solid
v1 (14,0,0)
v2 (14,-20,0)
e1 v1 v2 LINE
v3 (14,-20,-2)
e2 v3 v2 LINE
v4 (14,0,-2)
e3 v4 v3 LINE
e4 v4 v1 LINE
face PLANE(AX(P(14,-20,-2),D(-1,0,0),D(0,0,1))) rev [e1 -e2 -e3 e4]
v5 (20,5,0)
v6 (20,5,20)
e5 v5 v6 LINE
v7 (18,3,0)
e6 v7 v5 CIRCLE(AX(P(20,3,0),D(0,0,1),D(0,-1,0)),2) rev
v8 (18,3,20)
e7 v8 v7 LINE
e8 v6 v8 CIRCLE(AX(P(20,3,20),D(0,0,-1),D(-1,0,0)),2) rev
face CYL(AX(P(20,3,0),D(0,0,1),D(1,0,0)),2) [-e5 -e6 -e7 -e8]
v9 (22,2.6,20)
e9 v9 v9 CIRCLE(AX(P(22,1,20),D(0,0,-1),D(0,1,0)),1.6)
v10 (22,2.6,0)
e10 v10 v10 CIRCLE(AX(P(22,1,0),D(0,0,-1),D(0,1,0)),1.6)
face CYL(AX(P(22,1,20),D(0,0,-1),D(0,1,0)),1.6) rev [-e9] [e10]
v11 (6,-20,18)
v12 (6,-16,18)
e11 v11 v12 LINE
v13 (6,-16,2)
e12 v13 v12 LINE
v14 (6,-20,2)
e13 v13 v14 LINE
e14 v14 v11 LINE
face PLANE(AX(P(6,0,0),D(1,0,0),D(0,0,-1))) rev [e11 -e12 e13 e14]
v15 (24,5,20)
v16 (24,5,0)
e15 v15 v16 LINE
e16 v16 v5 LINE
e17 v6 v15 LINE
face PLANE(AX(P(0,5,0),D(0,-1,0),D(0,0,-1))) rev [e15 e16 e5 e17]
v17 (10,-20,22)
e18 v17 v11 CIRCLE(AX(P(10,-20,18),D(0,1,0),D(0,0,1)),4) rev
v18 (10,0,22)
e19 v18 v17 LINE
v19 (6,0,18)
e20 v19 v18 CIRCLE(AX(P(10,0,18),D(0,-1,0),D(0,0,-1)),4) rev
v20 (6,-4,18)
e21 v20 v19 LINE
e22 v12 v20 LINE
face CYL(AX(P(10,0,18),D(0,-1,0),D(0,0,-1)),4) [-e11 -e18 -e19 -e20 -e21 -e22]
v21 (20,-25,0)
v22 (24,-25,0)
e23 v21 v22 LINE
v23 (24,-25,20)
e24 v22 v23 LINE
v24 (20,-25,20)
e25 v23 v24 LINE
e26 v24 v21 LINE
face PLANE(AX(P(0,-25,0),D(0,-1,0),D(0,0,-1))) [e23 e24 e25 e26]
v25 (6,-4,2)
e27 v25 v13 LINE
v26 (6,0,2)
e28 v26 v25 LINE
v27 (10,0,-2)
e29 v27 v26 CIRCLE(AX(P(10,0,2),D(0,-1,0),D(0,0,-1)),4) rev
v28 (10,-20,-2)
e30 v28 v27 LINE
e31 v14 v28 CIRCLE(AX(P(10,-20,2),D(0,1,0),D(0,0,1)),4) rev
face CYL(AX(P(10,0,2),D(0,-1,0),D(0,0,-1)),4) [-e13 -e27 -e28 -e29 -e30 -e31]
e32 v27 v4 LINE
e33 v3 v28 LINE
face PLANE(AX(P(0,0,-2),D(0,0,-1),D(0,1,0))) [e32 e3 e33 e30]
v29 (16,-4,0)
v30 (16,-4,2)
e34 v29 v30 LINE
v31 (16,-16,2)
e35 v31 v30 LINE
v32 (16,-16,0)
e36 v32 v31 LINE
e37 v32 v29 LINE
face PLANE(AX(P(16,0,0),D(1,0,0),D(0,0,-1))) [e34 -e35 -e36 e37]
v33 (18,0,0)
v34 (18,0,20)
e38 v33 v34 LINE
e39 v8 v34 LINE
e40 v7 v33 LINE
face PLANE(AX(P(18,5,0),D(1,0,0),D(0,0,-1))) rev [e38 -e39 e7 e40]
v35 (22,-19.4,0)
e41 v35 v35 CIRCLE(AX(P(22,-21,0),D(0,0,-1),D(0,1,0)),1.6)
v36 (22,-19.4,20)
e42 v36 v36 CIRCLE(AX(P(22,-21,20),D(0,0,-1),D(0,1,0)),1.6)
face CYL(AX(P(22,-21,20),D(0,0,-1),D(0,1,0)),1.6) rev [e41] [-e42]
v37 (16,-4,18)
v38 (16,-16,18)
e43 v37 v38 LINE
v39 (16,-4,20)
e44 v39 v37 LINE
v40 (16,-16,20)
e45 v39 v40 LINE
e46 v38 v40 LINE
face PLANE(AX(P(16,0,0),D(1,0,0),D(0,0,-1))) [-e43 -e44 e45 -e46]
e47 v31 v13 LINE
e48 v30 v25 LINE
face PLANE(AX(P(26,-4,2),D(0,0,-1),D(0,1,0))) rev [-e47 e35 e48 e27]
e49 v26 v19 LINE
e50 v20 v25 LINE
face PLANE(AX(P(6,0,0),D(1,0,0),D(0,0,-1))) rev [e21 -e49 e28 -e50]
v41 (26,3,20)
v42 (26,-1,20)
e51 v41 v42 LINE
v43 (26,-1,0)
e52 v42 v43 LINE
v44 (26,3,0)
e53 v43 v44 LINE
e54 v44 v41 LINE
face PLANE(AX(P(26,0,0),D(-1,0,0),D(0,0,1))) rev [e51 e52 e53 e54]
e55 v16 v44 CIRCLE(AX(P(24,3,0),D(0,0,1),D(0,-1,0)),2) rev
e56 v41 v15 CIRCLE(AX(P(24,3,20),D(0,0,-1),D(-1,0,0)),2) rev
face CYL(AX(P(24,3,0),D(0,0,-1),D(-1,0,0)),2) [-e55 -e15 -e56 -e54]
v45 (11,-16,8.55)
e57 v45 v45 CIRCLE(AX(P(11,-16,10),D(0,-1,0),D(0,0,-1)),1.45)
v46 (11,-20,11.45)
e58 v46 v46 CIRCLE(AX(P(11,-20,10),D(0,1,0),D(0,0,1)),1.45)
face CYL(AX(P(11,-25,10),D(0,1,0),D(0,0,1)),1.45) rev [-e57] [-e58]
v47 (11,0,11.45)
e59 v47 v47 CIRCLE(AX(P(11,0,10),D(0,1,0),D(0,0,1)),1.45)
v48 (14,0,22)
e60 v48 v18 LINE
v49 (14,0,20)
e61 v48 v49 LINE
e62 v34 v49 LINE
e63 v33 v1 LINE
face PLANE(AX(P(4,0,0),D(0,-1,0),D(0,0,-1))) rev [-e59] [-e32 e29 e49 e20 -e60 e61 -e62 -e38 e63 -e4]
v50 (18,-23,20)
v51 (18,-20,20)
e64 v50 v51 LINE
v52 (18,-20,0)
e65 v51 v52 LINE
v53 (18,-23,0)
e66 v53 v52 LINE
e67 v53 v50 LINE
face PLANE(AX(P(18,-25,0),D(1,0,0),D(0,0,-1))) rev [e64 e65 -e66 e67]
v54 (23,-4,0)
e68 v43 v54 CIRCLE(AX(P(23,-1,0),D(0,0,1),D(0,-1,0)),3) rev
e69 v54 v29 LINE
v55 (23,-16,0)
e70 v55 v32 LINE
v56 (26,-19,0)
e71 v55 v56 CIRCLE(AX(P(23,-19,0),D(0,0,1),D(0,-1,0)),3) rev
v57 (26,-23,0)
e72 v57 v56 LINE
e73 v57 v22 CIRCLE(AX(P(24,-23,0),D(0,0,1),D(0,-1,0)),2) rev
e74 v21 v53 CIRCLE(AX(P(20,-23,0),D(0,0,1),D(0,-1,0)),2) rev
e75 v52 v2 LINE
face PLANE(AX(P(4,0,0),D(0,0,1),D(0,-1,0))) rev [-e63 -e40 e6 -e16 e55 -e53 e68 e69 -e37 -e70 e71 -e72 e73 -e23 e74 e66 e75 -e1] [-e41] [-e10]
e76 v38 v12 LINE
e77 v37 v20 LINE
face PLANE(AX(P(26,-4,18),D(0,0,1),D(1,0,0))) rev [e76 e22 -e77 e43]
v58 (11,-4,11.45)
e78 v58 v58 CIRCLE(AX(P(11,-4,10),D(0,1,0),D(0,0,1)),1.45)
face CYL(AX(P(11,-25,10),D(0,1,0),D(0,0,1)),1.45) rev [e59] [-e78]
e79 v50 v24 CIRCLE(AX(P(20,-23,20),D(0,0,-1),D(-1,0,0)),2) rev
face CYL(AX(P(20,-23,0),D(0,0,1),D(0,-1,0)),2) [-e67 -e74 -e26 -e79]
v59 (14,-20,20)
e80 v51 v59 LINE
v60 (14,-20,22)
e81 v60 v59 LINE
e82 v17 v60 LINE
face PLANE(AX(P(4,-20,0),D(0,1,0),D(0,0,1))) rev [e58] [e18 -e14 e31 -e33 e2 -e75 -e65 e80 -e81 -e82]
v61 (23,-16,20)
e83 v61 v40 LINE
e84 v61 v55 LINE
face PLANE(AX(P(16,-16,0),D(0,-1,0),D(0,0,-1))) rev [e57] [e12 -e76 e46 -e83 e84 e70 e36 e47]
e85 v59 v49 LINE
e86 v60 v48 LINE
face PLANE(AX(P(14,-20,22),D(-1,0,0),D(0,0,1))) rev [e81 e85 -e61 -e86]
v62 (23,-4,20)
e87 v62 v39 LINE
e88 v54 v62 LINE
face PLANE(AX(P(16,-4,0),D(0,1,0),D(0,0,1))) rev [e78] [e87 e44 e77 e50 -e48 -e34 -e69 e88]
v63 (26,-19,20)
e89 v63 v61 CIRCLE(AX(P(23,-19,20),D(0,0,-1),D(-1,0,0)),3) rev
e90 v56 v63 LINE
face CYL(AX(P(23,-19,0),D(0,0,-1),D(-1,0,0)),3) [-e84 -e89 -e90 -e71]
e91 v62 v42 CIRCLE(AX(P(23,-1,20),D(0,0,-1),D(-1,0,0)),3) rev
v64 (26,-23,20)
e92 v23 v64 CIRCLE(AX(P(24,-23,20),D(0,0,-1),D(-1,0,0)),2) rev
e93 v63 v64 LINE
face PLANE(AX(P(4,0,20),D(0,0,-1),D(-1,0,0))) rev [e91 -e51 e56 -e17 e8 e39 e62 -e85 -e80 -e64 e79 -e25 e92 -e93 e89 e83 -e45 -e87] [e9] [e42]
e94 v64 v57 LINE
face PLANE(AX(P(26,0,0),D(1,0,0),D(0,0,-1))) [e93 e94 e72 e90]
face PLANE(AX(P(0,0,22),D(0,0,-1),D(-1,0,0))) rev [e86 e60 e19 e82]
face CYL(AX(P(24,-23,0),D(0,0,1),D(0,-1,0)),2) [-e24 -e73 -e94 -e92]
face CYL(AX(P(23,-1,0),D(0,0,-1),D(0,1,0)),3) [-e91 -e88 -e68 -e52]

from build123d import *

# Parameters (mm, degrees)
SKETCH1_W           = 20
SKETCH1_H           = 20
BOSS_EXTRUDE1_DEPTH = 4
SKETCH2_R           = 3.7
CUT_EXTRUDE1_DEPTH  = 2.6
SKETCH3_R           = 2.1
CUT_EXTRUDE2_DEPTH  = 29.403520909
SKETCH4_W           = 12
SKETCH4_H           = 4
BOSS_EXTRUDE2_DEPTH = 12
SKETCH7_W           = 20
SKETCH7_H           = 4
BOSS_EXTRUDE3_DEPTH = 10
SKETCH8_W           = 8
SKETCH8_H           = 20
BOSS_EXTRUDE4_DEPTH = 5
SKETCH9_W           = 8
SKETCH9_H           = 20
BOSS_EXTRUDE5_DEPTH = 5
SKETCH10_R          = 1.6
CUT_EXTRUDE5_DEPTH  = 42.243181255
SKETCH11_W          = 30
SKETCH11_H          = 30
CUT_EXTRUDE6_DEPTH  = 6
SKETCH12_R          = 1.45
CUT_EXTRUDE7_DEPTH  = 42.243181255
SKETCH13_W          = 8
SKETCH13_H          = 20
BOSS_EXTRUDE6_DEPTH = 2
SKETCH14_W          = 8
SKETCH14_H          = 20
BOSS_EXTRUDE7_DEPTH = 2
SKETCH15_W          = 16
SKETCH15_H          = 12
CUT_EXTRUDE8_DEPTH  = 39.845849199
FILLET2_R           = 3
FILLET4_R           = 2
FILLET5_START       = -21
FILLET5_DEPTH       = 22


with BuildPart() as part:
    # Sketch1 → Boss-Extrude1 (new body)
    with BuildSketch(Plane(origin=(0, 0, 0), x_dir=(0, 0, -1), z_dir=(1, 0, 0))):
        with Locations((-10, -10)):
            Rectangle(SKETCH1_W, SKETCH1_H)
    extrude(amount=BOSS_EXTRUDE1_DEPTH)

    # Sketch2 → Cut-Extrude1 (cut)
    with BuildSketch(Plane(origin=(4, 0, 0), x_dir=(0, 0, -1), z_dir=(1, 0, 0))):
        with Locations((-10, -10)):
            Circle(SKETCH2_R)
    extrude(amount=-CUT_EXTRUDE1_DEPTH, mode=Mode.SUBTRACT)

    # Sketch3 → Cut-Extrude2 (cut, through all)
    with BuildSketch(Plane(origin=(1.4, 0, 0), x_dir=(0, 0, -1), z_dir=(1, 0, 0))):
        with Locations((-10, -10)):
            Circle(SKETCH3_R)
    extrude(amount=-CUT_EXTRUDE2_DEPTH, mode=Mode.SUBTRACT)

    # Sketch4 → Boss-Extrude2 (add)
    with BuildSketch(Plane(origin=(4, 0, 0), x_dir=(0, 0, -1), z_dir=(1, 0, 0))):
        Polygon((-20, 0), (-20, -20), (-16, -20), (-16, -16), (-16, -4), (-16, 0), align=None)
        with Locations((-10, -18)):
            Rectangle(SKETCH4_W, SKETCH4_H)
        Polygon((-4, -16), (-4, -20), (0, -20), (0, -4), (-4, -4), align=None)
        Polygon((0, 0), (-16, 0), (-16, -4), (-4, -4), (0, -4), align=None)
    extrude(amount=BOSS_EXTRUDE2_DEPTH)

    # Sketch7 → Boss-Extrude3 (add)
    with BuildSketch(Plane(origin=(16, 0, 0), x_dir=(0, 0, -1), z_dir=(1, 0, 0))):
        with Locations((-10, -18)):
            Rectangle(SKETCH7_W, SKETCH7_H)
        with Locations((-10, -2)):
            Rectangle(SKETCH7_W, SKETCH7_H)
    extrude(amount=BOSS_EXTRUDE3_DEPTH)

    # Sketch8 → Boss-Extrude4 (add)
    with BuildSketch(Plane(origin=(0, -20, 0), x_dir=(-1, 0, 0), z_dir=(0, -1, 0))):
        with Locations((-22, -10)):
            Rectangle(SKETCH8_W, SKETCH8_H)
    extrude(amount=BOSS_EXTRUDE4_DEPTH)

    # Sketch9 → Boss-Extrude5 (add)
    with BuildSketch(Plane(origin=(0, 0, 0), x_dir=(1, 0, 0), z_dir=(0, 1, 0))):
        with Locations((22, -10)):
            Rectangle(SKETCH9_W, SKETCH9_H)
    extrude(amount=BOSS_EXTRUDE5_DEPTH)

    # Sketch10 → Cut-Extrude5 (cut, through all)
    with BuildSketch(Plane(origin=(0, 0, 0), x_dir=(-1, 0, 0), z_dir=(0, 0, -1))):
        with Locations(Location((-22, 1, 0), (0, 0, 90))):
            Circle(SKETCH10_R)
        with Locations(Location((-22, -21, 0), (0, 0, 90))):
            Circle(SKETCH10_R)
    extrude(amount=-CUT_EXTRUDE5_DEPTH, mode=Mode.SUBTRACT)

    # Sketch11 → Cut-Extrude6 (cut)
    with BuildSketch(Plane.ZY):
        with Locations((15, -5)):
            Rectangle(SKETCH11_W, SKETCH11_H)
    extrude(amount=-CUT_EXTRUDE6_DEPTH, mode=Mode.SUBTRACT)

    # Sketch12 → Cut-Extrude7 (cut, through all)
    with BuildSketch(Plane(origin=(0, 0, 0), x_dir=(1, 0, 0), z_dir=(0, 1, 0))):
        with Locations(Location((11, -10, 0), (0, 0, 270))):
            Circle(SKETCH12_R)
    extrude(amount=-CUT_EXTRUDE7_DEPTH, mode=Mode.SUBTRACT)

    # Sketch13 → Boss-Extrude6 (add)
    with BuildSketch(Plane.XY.offset(20)):
        with Locations((10, -10)):
            Rectangle(SKETCH13_W, SKETCH13_H)
    extrude(amount=BOSS_EXTRUDE6_DEPTH)

    # Sketch14 → Boss-Extrude7 (add)
    with BuildSketch(Plane(origin=(0, 0, 0), x_dir=(-1, 0, 0), z_dir=(0, 0, -1))):
        with Locations((-10, -10)):
            Rectangle(SKETCH14_W, SKETCH14_H)
    extrude(amount=BOSS_EXTRUDE7_DEPTH)

    # Sketch15 → Cut-Extrude8 (cut, through all)
    with BuildSketch(Plane.ZY.offset(-6)):
        with Locations((10, -10)):
            Rectangle(SKETCH15_W, SKETCH15_H)
    extrude(amount=-CUT_EXTRUDE8_DEPTH, mode=Mode.SUBTRACT)

    # Fillet2
    fillet2_edges = [part.edges().sort_by_distance(p)[0] for p in [
        (26, -16, 10),
        (26, -4, 10),
    ]]
    fillet(fillet2_edges, radius=FILLET2_R)

    # Fillet4
    fillet4_edges = [part.edges().sort_by_distance(p)[0] for p in [
        (26, -25, 10),
        (18, -25, 10),
        (26, 5, 10),
        (18, 5, 10),
    ]]
    fillet(fillet4_edges, radius=FILLET4_R)

    # Fillet5: read off the stored shape, not the designer's step
    # Fillet5 outline → Fillet5 (cut)
    with BuildSketch(Plane(origin=(0, 0, 0), x_dir=(1, 0, 0), z_dir=(0, 1, 0)).offset(FILLET5_START)):
        with BuildLine():
            Line((6, 2), (6, -2))
            ThreePointArc((6, -2), (7.171572875, 0.828427125), (10, 2))
            Line((10, 2), (6, 2))
        make_face()
        with BuildLine():
            ThreePointArc((10, -22), (7.171572875, -20.828427125), (6, -18))
            Line((6, -18), (6, -22))
            Line((6, -22), (10, -22))
        make_face()
    extrude(amount=FILLET5_DEPTH, mode=Mode.SUBTRACT)


solid = part.part
